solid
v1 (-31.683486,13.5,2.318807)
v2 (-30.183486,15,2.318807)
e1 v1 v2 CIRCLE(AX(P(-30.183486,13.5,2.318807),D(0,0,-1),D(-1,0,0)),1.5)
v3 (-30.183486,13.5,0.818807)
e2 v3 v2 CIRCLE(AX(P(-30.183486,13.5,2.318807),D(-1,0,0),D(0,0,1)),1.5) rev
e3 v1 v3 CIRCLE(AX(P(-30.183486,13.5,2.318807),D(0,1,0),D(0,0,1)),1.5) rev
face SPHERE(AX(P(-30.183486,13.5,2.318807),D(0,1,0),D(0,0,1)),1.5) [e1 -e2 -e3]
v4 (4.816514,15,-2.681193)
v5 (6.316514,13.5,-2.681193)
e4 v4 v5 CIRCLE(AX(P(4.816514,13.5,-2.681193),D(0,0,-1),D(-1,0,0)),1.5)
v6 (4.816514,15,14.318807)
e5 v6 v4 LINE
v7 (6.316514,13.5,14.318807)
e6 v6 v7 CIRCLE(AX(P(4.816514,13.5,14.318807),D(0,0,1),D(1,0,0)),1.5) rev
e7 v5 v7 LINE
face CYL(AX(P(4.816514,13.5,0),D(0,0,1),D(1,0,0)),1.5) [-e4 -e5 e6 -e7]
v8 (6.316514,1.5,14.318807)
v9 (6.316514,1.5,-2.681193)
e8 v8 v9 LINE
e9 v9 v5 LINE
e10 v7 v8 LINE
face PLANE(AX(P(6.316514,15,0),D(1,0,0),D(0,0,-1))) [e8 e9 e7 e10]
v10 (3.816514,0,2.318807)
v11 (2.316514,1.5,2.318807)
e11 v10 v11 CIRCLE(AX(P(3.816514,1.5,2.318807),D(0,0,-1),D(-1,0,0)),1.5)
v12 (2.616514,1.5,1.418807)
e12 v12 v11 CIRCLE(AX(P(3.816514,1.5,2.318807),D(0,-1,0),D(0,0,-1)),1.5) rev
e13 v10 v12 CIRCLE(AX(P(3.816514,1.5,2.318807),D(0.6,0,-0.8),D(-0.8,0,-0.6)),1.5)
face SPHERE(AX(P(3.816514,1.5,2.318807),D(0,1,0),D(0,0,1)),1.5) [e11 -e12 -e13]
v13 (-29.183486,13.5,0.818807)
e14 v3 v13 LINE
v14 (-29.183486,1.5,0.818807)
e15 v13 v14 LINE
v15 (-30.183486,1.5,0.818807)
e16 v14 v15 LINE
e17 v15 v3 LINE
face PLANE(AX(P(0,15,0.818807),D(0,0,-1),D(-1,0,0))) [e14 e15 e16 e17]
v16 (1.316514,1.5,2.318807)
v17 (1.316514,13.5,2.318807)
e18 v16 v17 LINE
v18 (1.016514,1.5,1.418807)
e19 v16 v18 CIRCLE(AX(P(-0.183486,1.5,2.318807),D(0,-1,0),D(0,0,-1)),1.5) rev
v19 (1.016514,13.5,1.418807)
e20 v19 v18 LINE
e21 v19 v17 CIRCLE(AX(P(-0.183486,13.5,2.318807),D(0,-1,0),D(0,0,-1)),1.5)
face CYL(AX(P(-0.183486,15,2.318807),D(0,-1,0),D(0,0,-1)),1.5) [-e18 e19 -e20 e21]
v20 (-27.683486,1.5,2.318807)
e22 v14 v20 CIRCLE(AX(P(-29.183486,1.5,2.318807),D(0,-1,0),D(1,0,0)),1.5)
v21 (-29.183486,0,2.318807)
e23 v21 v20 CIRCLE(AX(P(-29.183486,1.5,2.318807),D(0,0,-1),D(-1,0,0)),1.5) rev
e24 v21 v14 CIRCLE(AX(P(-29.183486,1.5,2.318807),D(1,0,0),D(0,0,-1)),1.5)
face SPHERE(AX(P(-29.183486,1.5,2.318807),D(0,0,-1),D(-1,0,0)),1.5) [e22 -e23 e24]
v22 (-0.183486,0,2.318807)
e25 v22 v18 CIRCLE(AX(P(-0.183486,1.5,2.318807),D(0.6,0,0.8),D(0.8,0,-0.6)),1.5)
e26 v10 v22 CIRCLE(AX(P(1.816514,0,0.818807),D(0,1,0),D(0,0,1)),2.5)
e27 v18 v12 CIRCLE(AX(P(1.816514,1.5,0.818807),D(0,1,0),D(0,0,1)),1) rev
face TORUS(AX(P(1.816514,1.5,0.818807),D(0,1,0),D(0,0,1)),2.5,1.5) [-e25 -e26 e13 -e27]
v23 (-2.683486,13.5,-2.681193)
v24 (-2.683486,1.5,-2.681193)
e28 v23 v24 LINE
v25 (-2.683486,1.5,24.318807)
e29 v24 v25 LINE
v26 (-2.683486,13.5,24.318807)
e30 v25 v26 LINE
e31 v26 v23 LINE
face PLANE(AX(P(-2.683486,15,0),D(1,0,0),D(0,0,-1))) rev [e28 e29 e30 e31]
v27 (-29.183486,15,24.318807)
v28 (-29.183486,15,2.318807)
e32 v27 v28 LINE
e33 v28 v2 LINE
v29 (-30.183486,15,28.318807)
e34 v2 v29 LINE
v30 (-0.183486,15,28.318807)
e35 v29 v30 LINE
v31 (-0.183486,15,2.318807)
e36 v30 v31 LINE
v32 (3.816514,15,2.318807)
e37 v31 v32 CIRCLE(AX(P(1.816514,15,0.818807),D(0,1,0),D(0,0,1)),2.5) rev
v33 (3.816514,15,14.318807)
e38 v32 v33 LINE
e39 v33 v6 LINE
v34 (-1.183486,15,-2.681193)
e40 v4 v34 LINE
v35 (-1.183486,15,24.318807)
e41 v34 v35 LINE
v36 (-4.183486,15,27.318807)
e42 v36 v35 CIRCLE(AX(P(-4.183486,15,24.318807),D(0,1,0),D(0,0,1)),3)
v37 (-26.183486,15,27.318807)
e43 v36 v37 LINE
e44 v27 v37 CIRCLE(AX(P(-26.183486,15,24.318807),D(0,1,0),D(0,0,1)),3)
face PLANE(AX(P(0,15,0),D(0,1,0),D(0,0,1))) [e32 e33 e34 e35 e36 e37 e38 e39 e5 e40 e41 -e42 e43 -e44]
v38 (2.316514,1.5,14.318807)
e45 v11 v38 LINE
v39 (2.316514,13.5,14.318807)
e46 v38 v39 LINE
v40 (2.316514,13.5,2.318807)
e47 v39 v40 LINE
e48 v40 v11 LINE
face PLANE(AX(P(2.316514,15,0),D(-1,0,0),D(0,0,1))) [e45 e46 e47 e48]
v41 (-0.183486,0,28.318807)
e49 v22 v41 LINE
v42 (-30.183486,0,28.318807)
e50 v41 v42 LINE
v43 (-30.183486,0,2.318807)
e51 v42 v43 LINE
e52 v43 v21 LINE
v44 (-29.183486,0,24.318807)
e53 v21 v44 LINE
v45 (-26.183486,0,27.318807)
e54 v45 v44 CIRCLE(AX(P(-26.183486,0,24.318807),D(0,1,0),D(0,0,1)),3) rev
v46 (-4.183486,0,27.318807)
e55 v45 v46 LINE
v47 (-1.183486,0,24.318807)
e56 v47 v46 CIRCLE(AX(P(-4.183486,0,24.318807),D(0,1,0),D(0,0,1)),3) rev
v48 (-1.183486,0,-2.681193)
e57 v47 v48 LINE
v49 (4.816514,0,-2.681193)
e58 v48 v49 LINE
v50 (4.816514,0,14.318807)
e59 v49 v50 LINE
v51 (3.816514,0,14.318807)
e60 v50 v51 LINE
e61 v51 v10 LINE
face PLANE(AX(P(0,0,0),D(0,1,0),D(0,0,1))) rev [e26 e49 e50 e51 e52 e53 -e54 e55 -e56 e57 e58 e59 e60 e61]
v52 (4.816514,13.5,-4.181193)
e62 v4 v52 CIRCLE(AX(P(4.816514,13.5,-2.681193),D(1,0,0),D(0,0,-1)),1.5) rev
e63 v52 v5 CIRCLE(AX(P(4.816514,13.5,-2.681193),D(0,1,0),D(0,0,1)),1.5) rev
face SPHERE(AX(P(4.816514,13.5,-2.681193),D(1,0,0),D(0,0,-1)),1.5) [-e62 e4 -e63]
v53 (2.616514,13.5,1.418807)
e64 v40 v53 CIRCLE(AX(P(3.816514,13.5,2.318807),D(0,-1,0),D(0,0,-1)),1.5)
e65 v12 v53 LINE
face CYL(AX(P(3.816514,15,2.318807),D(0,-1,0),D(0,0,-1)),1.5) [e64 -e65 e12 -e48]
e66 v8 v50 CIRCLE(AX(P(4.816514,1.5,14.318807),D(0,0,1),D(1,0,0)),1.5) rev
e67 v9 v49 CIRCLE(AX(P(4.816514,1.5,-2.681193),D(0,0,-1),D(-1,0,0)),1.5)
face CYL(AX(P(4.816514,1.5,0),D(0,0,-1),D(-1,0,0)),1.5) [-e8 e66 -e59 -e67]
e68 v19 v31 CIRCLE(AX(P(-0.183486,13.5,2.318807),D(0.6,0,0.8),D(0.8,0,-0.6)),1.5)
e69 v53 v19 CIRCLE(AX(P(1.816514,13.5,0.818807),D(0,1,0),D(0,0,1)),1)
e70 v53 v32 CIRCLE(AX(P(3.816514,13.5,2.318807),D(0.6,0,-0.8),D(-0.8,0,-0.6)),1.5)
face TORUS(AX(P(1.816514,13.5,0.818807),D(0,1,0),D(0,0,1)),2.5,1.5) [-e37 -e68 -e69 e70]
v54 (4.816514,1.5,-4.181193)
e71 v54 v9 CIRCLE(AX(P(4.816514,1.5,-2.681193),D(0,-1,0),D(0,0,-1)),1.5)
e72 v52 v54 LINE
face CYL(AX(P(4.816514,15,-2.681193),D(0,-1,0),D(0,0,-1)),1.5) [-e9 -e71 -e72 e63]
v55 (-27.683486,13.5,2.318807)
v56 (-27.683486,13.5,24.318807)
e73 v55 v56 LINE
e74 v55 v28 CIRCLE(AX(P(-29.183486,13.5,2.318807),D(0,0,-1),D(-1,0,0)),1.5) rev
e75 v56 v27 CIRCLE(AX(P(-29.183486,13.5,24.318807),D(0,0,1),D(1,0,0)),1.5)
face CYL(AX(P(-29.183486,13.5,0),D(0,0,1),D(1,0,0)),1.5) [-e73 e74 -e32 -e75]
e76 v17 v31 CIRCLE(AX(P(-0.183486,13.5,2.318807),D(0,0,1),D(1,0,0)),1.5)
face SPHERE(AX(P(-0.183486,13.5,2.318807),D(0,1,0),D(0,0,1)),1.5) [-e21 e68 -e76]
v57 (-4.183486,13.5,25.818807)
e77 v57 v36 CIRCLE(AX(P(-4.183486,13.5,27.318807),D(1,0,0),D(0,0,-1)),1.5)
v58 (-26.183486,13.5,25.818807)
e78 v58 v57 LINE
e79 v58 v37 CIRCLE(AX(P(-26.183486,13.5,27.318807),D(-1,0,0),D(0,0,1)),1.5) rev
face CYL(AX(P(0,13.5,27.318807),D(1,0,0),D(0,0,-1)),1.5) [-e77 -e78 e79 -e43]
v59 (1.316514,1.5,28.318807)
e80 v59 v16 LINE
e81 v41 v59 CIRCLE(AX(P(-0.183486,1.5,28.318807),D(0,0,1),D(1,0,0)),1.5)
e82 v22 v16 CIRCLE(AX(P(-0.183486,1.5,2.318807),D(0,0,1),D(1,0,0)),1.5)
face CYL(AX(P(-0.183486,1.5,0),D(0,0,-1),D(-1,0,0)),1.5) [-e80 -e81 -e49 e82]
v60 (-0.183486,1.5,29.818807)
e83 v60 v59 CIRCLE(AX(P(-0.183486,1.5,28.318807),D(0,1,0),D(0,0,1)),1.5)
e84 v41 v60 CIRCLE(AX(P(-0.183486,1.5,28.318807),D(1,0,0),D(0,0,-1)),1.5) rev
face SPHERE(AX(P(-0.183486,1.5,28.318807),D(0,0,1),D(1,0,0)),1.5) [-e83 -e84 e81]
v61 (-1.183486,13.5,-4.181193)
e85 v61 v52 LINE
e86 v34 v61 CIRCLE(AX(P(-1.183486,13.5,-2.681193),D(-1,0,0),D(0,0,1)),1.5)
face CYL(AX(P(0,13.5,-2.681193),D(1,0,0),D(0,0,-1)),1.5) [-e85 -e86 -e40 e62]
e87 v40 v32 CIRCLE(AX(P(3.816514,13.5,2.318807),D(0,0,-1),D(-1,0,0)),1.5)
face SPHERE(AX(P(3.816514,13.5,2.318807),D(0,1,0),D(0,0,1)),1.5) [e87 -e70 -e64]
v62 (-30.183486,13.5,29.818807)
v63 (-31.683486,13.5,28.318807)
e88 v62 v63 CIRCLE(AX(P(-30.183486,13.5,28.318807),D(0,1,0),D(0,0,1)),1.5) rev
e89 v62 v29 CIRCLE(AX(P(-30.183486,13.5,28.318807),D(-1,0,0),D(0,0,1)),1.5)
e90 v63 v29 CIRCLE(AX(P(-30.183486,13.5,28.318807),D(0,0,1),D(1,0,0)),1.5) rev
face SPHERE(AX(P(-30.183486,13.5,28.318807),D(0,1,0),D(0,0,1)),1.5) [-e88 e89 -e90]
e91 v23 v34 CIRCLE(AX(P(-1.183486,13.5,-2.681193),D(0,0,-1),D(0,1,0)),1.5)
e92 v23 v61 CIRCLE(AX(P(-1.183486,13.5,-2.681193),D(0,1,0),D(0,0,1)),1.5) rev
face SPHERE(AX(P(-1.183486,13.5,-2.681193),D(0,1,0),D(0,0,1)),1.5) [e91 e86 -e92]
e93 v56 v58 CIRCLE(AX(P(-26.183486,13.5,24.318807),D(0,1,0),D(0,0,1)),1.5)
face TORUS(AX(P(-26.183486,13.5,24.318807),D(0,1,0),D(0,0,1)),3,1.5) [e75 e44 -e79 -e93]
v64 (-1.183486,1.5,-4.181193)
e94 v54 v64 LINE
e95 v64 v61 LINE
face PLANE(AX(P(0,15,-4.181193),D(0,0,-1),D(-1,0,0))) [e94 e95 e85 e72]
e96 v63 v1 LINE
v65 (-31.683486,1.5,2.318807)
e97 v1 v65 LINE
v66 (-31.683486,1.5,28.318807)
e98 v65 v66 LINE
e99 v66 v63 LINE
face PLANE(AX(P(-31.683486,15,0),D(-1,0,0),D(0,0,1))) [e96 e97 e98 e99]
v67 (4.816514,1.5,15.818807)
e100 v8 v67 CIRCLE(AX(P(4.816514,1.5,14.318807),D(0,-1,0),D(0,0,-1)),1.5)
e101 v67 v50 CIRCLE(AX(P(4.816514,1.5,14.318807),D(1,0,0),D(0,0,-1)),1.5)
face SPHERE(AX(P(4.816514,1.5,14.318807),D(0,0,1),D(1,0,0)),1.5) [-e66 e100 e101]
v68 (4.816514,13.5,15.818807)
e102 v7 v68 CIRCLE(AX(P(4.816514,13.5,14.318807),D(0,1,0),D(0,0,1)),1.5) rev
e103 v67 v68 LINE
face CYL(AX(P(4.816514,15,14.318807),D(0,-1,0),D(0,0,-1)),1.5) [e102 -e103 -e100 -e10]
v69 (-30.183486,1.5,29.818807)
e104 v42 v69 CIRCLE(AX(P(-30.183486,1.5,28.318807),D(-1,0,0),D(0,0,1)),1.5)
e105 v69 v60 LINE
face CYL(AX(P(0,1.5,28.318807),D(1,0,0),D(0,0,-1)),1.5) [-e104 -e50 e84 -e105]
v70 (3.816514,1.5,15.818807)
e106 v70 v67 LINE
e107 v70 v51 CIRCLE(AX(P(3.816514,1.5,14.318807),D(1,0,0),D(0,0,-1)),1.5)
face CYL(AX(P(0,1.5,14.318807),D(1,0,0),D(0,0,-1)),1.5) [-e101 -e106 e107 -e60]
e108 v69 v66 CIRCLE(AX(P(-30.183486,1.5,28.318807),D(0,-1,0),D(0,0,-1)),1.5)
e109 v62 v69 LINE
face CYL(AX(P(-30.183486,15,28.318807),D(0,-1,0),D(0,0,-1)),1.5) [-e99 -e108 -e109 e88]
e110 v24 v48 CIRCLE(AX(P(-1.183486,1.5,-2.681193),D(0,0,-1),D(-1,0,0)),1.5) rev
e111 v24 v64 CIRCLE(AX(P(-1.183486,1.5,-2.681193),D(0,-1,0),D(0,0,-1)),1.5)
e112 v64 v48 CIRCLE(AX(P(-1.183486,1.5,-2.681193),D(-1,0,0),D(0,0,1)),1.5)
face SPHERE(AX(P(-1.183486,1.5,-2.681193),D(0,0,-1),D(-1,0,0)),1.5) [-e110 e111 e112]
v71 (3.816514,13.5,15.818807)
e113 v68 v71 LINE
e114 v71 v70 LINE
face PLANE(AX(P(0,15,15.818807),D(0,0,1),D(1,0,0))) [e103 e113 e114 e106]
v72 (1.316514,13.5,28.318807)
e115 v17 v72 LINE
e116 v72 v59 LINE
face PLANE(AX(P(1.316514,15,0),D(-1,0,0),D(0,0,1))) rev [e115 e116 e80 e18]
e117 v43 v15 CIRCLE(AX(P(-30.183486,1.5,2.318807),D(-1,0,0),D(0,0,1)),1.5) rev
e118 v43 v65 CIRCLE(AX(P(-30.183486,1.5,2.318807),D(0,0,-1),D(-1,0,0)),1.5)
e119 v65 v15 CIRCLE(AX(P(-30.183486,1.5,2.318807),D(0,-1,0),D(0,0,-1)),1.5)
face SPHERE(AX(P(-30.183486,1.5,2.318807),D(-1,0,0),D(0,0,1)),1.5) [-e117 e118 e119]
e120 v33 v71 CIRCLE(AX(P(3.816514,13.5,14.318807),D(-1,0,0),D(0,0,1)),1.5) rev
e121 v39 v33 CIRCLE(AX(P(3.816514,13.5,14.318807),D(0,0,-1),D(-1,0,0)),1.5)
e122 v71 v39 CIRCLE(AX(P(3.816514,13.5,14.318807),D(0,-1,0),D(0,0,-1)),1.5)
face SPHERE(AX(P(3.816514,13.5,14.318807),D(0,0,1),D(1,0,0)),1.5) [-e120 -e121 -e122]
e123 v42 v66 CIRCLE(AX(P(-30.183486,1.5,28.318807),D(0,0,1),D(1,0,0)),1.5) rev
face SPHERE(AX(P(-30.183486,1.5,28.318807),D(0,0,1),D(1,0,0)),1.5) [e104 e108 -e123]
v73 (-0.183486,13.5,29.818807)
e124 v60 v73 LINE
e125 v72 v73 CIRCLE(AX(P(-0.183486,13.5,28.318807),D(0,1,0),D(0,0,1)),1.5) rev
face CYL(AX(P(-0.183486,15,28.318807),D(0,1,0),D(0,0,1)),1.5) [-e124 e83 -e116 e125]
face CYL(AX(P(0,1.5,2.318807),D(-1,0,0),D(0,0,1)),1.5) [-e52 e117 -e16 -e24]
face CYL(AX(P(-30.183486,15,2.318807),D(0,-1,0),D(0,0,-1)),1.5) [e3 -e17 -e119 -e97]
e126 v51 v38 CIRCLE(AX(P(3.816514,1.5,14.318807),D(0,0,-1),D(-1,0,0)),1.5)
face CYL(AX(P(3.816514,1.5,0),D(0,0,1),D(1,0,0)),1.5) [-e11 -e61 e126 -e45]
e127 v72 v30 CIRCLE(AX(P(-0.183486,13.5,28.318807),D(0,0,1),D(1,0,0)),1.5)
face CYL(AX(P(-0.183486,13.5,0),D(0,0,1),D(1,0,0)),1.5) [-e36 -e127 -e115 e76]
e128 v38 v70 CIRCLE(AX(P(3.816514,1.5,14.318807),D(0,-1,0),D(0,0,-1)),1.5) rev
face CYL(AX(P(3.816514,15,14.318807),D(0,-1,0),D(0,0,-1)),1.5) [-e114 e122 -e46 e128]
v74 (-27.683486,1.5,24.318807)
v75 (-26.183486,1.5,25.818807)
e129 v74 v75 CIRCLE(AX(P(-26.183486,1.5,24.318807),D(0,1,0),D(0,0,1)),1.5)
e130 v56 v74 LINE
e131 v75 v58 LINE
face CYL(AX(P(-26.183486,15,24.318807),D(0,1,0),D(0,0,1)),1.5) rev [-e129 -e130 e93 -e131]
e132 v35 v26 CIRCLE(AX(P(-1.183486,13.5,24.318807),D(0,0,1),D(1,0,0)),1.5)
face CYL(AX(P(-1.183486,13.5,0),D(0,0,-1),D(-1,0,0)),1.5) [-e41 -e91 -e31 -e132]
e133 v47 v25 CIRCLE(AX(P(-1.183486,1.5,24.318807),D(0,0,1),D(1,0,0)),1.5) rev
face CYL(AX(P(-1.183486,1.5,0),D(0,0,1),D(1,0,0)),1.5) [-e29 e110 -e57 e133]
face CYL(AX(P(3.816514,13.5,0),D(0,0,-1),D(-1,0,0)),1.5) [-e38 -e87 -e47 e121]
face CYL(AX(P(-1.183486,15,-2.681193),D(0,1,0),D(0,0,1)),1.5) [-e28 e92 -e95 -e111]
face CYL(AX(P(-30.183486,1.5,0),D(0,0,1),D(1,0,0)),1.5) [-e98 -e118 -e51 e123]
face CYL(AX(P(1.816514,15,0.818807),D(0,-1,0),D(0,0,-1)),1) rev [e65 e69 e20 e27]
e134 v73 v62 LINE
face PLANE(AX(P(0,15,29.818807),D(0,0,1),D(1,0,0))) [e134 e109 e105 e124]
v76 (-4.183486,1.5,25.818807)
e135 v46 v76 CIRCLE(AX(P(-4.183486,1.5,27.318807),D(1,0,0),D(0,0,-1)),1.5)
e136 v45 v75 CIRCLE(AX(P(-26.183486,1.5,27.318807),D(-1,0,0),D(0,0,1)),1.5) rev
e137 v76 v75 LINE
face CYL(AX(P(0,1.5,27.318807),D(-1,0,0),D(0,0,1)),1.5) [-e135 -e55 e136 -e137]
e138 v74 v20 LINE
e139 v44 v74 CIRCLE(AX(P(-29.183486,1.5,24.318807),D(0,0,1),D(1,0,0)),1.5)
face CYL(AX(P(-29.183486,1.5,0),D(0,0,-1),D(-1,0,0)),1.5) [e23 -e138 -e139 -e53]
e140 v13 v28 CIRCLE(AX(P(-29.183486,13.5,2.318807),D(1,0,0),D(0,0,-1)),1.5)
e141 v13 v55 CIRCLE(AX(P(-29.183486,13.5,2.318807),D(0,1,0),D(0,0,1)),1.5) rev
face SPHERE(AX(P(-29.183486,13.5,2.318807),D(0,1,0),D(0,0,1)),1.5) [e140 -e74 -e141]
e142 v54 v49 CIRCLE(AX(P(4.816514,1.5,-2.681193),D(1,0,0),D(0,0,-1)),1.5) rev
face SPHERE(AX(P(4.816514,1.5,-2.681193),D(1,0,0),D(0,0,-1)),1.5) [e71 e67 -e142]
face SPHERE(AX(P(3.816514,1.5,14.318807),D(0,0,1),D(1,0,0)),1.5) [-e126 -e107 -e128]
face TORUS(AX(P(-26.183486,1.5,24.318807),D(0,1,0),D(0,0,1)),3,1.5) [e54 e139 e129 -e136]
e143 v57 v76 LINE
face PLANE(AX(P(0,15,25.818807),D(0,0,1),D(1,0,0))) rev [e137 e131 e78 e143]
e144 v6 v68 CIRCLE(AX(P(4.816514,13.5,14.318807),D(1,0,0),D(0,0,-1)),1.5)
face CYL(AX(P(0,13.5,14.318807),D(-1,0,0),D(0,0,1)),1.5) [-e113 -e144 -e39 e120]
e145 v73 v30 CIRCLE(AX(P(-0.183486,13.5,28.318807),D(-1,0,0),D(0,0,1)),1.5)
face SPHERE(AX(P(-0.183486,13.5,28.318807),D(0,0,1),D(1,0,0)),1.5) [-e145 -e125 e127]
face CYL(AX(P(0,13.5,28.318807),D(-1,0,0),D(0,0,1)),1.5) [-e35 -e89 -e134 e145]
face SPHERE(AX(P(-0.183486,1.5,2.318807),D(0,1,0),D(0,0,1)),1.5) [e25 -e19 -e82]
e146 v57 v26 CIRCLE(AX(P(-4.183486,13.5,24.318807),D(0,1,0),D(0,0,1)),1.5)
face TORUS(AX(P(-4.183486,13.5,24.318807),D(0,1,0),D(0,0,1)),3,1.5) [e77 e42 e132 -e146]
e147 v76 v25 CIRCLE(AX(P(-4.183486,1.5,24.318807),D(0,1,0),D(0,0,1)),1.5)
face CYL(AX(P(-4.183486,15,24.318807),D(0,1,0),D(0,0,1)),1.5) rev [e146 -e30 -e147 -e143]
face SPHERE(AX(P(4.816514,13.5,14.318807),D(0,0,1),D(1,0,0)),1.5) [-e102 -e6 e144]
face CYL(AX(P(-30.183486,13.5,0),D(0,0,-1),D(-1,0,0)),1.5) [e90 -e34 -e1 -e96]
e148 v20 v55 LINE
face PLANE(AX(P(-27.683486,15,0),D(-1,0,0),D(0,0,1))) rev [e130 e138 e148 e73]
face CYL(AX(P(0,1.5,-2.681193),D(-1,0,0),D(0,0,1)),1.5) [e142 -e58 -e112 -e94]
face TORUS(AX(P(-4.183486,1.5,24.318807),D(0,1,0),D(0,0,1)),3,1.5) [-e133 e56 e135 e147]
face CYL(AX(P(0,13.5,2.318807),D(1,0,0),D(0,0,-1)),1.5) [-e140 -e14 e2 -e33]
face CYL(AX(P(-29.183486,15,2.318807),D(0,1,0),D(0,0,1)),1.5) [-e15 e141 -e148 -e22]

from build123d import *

# Parameters (mm, degrees)
SKETCH1_W           = 4
SKETCH1_H           = 25
BOSS_EXTRUDE1_DEPTH = 15
FILLET1_R           = 1.5
FILLET2_R           = 1.5


with BuildPart() as part:
    # Sketch1 → Boss-Extrude1 (new body)
    with BuildSketch(Plane(origin=(0, 0, 0), x_dir=(1, 0, 0), z_dir=(0, 1, 0))):
        with Locations((-29.683486239, -13.318807339)):
            Rectangle(SKETCH1_W, SKETCH1_H)
        Polygon((-2.683486239, -29.818807339), (-2.683486239, -25.818807339), (-27.683486239, -25.818807339), (-31.683486239, -25.818807339), (-31.683486239, -29.818807339), align=None)
        with BuildLine():
            Line((1.816513761, 0.181192661), (1.816513761, 4.181192661))
            Line((1.816513761, 4.181192661), (-2.683486239, 4.181192661))
            Line((-2.683486239, 4.181192661), (-2.683486239, -25.818807339))
            Line((-2.683486239, -25.818807339), (-2.683486239, -29.818807339))
            Line((-2.683486239, -29.818807339), (1.316513761, -29.818807339))
            Line((1.316513761, -29.818807339), (1.316513761, -1.684832743))
            ThreePointArc((1.316513761, -1.684832743), (0.850587935, -0.559988294), (1.816513761, 0.181192661))
        make_face()
        with BuildLine():
            Line((6.316513761, 4.181192661), (1.816513761, 4.181192661))
            Line((1.816513761, 4.181192661), (1.816513761, 0.181192661))
            ThreePointArc((1.816513761, 0.181192661), (2.523620543, -0.111700558), (2.816513761, -0.818807339))
            ThreePointArc((2.816513761, -0.818807339), (2.682539165, -1.318807339), (2.316513761, -1.684832743))
            Line((2.316513761, -1.684832743), (2.316513761, -15.818807339))
            Line((2.316513761, -15.818807339), (6.316513761, -15.818807339))
            Line((6.316513761, -15.818807339), (6.316513761, 4.181192661))
        make_face()
    extrude(amount=BOSS_EXTRUDE1_DEPTH)

    # Fillet1
    fillet1_edges = [part.edges().sort_by_distance(p)[0] for p in [
        (-15.183486239, 15, 29.818807339),
        (-29.683486239, 0, 0.818807339),
        (-27.683486239, 0, 13.318807339),
        (-15.183486239, 0, 25.818807339),
        (-2.683486239, 0, 10.818807339),
        (1.816513761, 0, -4.181192661),
        (6.316513761, 0, 5.818807339),
        (4.316513761, 0, 15.818807339),
        (-15.183486239, 0, 29.818807339),
        (-31.683486239, 0, 15.318807339),
        (-31.683486239, 7.5, 0.818807339),
        (-27.683486239, 7.5, 0.818807339),
        (-27.683486239, 7.5, 25.818807339),
        (-2.683486239, 7.5, 25.818807339),
        (-2.683486239, 7.5, -4.181192661),
        (6.316513761, 7.5, -4.181192661),
        (6.316513761, 7.5, 15.818807339),
        (2.316513761, 7.5, 15.818807339),
        (2.316513761, 7.5, 1.684832743),
        (1.316513761, 7.5, 1.684832743),
        (1.316513761, 7.5, 29.818807339),
        (-31.683486239, 7.5, 29.818807339),
        (4.316513761, 15, 15.818807339),
        (6.316513761, 15, 5.818807339),
        (1.816513761, 15, -4.181192661),
        (-31.683486239, 15, 15.318807339),
        (-2.683486239, 15, 10.818807339),
        (-15.183486239, 15, 25.818807339),
        (-27.683486239, 15, 13.318807339),
        (-29.683486239, 15, 0.818807339),
    ]]
    fillet(fillet1_edges, radius=FILLET1_R)

    # Fillet2
    # the kernel refuses this fillet: 1.5 mm, written as the material it takes off along each edge
    with BuildSketch(Plane(origin=(-0.183486239, 13.5, 28.318807339), x_dir=(1, 0, 0), z_dir=(0, 1, 0))) as fillet2_piece_1_section:
        Polygon((0, 0), (FILLET2_R, 0), (FILLET2_R, -FILLET2_R), (0, -FILLET2_R), align=None)
    fillet2_piece_1 = extrude(amount=FILLET2_R, mode=Mode.PRIVATE)
    fillet2_piece_1 = fillet2_piece_1 - Plane(origin=(-0.183486239, 13.5, 28.318807339), x_dir=(-0.7071067811865475, 0, -0.7071067811865475), z_dir=(0, 1, 0)) * Sphere(FILLET2_R, mode=Mode.PRIVATE)
    add(fillet2_piece_1, mode=Mode.SUBTRACT)
    with BuildSketch(Plane(origin=(-0.183486239, 1.5, 28.318807339), x_dir=(1, 0, 0), z_dir=(0, -1, 0))) as fillet2_piece_2_section:
        Polygon((0, 0), (FILLET2_R, 0), (FILLET2_R, FILLET2_R), (0, FILLET2_R), align=None)
    fillet2_piece_2 = extrude(amount=FILLET2_R, mode=Mode.PRIVATE)
    fillet2_piece_2 = fillet2_piece_2 - Plane(origin=(-0.183486239, 1.5, 28.318807339), x_dir=(-0.7071067811865475, 0, -0.7071067811865475), z_dir=(0, -1, 0)) * Sphere(FILLET2_R, mode=Mode.PRIVATE)
    add(fillet2_piece_2, mode=Mode.SUBTRACT)
    with BuildSketch(Plane(origin=(3.816513761, 13.5, 14.318807339), x_dir=(-1, 0, 0), z_dir=(0, 1, 0))) as fillet2_piece_3_section:
        Polygon((0, 0), (FILLET2_R, 0), (FILLET2_R, FILLET2_R), (0, FILLET2_R), align=None)
    fillet2_piece_3 = extrude(amount=FILLET2_R, mode=Mode.PRIVATE)
    fillet2_piece_3 = fillet2_piece_3 - Plane(origin=(3.816513761, 13.5, 14.318807339), x_dir=(0.7071067811865475, 0, -0.7071067811865477), z_dir=(0, 1, 0)) * Sphere(FILLET2_R, mode=Mode.PRIVATE)
    add(fillet2_piece_3, mode=Mode.SUBTRACT)
    with BuildSketch(Plane(origin=(3.816513761, 1.5, 14.318807339), x_dir=(-1, 0, 0), z_dir=(0, -1, 0))) as fillet2_piece_4_section:
        Polygon((0, 0), (FILLET2_R, 0), (FILLET2_R, -FILLET2_R), (0, -FILLET2_R), align=None)
    fillet2_piece_4 = extrude(amount=FILLET2_R, mode=Mode.PRIVATE)
    fillet2_piece_4 = fillet2_piece_4 - Plane(origin=(3.816513761, 1.5, 14.318807339), x_dir=(0.7071067811865475, 0, -0.7071067811865477), z_dir=(0, -1, 0)) * Sphere(FILLET2_R, mode=Mode.PRIVATE)
    add(fillet2_piece_4, mode=Mode.SUBTRACT)
    with BuildSketch(Plane(origin=(2.316513761, 0, 2.318807339), x_dir=(1, 0, 0), z_dir=(0, 0, 1))) as fillet2_piece_5:
        with BuildLine():
            CenterArc((FILLET2_R, FILLET2_R), FILLET2_R, 180, 90)
            Line((0, FILLET2_R), (0, 0))
            Line((0, 0), (FILLET2_R, 0))
        make_face()
    extrude(amount=12, mode=Mode.SUBTRACT)
    with BuildSketch(Plane(origin=(1.816513761, 0, 0.818807339), x_dir=(0.8000000000000007, 0, 0.5999999999999992), z_dir=(-0.5999999999999992, 0, 0.8000000000000007))) as fillet2_piece_6:
        with BuildLine():
            CenterArc((1 + FILLET2_R, FILLET2_R), FILLET2_R, 180, 90)
            Line((1, FILLET2_R), (1, 0))
            Line((1, 0), (1 + FILLET2_R, 0))
        make_face()
    revolve(axis=Axis((1.816513761, 0, 0.818807339), (0, 1, 0)), revolution_arc=253.739795292, mode=Mode.SUBTRACT)
    with BuildSketch(Plane(origin=(1.316513761, 0, 28.318807339), x_dir=(-1, 0, 0), z_dir=(0, 0, -1))) as fillet2_piece_7:
        with BuildLine():
            CenterArc((FILLET2_R, FILLET2_R), FILLET2_R, 180, 90)
            Line((0, FILLET2_R), (0, 0))
            Line((0, 0), (FILLET2_R, 0))
        make_face()
    extrude(amount=26, mode=Mode.SUBTRACT)
    with BuildSketch(Plane(origin=(3.816513761, 0, 2.318807339), x_dir=(-1, 0, 0), z_dir=(0, 0, 1))) as fillet2_piece_8:
        with BuildLine():
            CenterArc((1.5 - FILLET2_R, -FILLET2_R), FILLET2_R, 0, 90)
            Line((1.5, -FILLET2_R), (1.5, 0))
            Line((1.5, 0), (1.5 - FILLET2_R, 0))
        make_face()
    revolve(axis=Axis((3.816513761, 0, 2.318807339), (0, -1, 0)), revolution_arc=36.869897646, mode=Mode.SUBTRACT)
    with BuildSketch(Plane(origin=(-0.183486239, 0, 2.318807339), x_dir=(0.7999999999999999, 0, -0.6000000000000001), z_dir=(-0.6000000000000001, 0, -0.7999999999999999))) as fillet2_piece_9:
        with BuildLine():
            CenterArc((1.5 - FILLET2_R, -FILLET2_R), FILLET2_R, 0, 90)
            Line((1.5, -FILLET2_R), (1.5, 0))
            Line((1.5, 0), (1.5 - FILLET2_R, 0))
        make_face()
    revolve(axis=Axis((-0.183486239, 0, 2.318807339), (0, -1, 0)), revolution_arc=36.869897646, mode=Mode.SUBTRACT)
    with BuildSketch(Plane(origin=(1.316513761, 15, 28.318807339), x_dir=(-1, 0, 0), z_dir=(0, 0, -1))) as fillet2_piece_10:
        with BuildLine():
            CenterArc((FILLET2_R, -FILLET2_R), FILLET2_R, 90, 90)
            Line((0, -FILLET2_R), (0, 0))
            Line((0, 0), (FILLET2_R, 0))
        make_face()
    extrude(amount=26, mode=Mode.SUBTRACT)
    with BuildSketch(Plane(origin=(1.816513761, 15, 0.818807339), x_dir=(-0.8000000000000002, 0, 0.5999999999999998), z_dir=(0.5999999999999998, 0, 0.8000000000000002))) as fillet2_piece_11:
        with BuildLine():
            CenterArc((1 + FILLET2_R, FILLET2_R), FILLET2_R, 180, 90)
            Line((1, FILLET2_R), (1, 0))
            Line((1, 0), (1 + FILLET2_R, 0))
        make_face()
    revolve(axis=Axis((1.816513761, 15, 0.818807339), (0, -1, 0)), revolution_arc=253.739795292, mode=Mode.SUBTRACT)
    with BuildSketch(Plane(origin=(2.316513761, 15, 2.318807339), x_dir=(1, 0, 0), z_dir=(0, 0, 1))) as fillet2_piece_12:
        with BuildLine():
            CenterArc((FILLET2_R, -FILLET2_R), FILLET2_R, 90, 90)
            Line((0, -FILLET2_R), (0, 0))
            Line((0, 0), (FILLET2_R, 0))
        make_face()
    extrude(amount=12, mode=Mode.SUBTRACT)
    with BuildSketch(Plane(origin=(3.816513761, 15, 2.318807339), x_dir=(-1, 0, 0), z_dir=(0, 0, 1))) as fillet2_piece_13:
        with BuildLine():
            CenterArc((1.5 - FILLET2_R, FILLET2_R), FILLET2_R, 270, 90)
            Line((1.5, FILLET2_R), (1.5, 0))
            Line((1.5, 0), (1.5 - FILLET2_R, 0))
        make_face()
    revolve(axis=Axis((3.816513761, 15, 2.318807339), (0, -1, 0)), revolution_arc=36.869897646, mode=Mode.SUBTRACT)
    with BuildSketch(Plane(origin=(-0.183486239, 15, 2.318807339), x_dir=(0.7999999999999999, 0, -0.6000000000000001), z_dir=(-0.6000000000000001, 0, -0.7999999999999999))) as fillet2_piece_14:
        with BuildLine():
            CenterArc((1.5 - FILLET2_R, FILLET2_R), FILLET2_R, 270, 90)
            Line((1.5, FILLET2_R), (1.5, 0))
            Line((1.5, 0), (1.5 - FILLET2_R, 0))
        make_face()
    revolve(axis=Axis((-0.183486239, 15, 2.318807339), (0, -1, 0)), revolution_arc=36.869897646, mode=Mode.SUBTRACT)


solid = part.part
